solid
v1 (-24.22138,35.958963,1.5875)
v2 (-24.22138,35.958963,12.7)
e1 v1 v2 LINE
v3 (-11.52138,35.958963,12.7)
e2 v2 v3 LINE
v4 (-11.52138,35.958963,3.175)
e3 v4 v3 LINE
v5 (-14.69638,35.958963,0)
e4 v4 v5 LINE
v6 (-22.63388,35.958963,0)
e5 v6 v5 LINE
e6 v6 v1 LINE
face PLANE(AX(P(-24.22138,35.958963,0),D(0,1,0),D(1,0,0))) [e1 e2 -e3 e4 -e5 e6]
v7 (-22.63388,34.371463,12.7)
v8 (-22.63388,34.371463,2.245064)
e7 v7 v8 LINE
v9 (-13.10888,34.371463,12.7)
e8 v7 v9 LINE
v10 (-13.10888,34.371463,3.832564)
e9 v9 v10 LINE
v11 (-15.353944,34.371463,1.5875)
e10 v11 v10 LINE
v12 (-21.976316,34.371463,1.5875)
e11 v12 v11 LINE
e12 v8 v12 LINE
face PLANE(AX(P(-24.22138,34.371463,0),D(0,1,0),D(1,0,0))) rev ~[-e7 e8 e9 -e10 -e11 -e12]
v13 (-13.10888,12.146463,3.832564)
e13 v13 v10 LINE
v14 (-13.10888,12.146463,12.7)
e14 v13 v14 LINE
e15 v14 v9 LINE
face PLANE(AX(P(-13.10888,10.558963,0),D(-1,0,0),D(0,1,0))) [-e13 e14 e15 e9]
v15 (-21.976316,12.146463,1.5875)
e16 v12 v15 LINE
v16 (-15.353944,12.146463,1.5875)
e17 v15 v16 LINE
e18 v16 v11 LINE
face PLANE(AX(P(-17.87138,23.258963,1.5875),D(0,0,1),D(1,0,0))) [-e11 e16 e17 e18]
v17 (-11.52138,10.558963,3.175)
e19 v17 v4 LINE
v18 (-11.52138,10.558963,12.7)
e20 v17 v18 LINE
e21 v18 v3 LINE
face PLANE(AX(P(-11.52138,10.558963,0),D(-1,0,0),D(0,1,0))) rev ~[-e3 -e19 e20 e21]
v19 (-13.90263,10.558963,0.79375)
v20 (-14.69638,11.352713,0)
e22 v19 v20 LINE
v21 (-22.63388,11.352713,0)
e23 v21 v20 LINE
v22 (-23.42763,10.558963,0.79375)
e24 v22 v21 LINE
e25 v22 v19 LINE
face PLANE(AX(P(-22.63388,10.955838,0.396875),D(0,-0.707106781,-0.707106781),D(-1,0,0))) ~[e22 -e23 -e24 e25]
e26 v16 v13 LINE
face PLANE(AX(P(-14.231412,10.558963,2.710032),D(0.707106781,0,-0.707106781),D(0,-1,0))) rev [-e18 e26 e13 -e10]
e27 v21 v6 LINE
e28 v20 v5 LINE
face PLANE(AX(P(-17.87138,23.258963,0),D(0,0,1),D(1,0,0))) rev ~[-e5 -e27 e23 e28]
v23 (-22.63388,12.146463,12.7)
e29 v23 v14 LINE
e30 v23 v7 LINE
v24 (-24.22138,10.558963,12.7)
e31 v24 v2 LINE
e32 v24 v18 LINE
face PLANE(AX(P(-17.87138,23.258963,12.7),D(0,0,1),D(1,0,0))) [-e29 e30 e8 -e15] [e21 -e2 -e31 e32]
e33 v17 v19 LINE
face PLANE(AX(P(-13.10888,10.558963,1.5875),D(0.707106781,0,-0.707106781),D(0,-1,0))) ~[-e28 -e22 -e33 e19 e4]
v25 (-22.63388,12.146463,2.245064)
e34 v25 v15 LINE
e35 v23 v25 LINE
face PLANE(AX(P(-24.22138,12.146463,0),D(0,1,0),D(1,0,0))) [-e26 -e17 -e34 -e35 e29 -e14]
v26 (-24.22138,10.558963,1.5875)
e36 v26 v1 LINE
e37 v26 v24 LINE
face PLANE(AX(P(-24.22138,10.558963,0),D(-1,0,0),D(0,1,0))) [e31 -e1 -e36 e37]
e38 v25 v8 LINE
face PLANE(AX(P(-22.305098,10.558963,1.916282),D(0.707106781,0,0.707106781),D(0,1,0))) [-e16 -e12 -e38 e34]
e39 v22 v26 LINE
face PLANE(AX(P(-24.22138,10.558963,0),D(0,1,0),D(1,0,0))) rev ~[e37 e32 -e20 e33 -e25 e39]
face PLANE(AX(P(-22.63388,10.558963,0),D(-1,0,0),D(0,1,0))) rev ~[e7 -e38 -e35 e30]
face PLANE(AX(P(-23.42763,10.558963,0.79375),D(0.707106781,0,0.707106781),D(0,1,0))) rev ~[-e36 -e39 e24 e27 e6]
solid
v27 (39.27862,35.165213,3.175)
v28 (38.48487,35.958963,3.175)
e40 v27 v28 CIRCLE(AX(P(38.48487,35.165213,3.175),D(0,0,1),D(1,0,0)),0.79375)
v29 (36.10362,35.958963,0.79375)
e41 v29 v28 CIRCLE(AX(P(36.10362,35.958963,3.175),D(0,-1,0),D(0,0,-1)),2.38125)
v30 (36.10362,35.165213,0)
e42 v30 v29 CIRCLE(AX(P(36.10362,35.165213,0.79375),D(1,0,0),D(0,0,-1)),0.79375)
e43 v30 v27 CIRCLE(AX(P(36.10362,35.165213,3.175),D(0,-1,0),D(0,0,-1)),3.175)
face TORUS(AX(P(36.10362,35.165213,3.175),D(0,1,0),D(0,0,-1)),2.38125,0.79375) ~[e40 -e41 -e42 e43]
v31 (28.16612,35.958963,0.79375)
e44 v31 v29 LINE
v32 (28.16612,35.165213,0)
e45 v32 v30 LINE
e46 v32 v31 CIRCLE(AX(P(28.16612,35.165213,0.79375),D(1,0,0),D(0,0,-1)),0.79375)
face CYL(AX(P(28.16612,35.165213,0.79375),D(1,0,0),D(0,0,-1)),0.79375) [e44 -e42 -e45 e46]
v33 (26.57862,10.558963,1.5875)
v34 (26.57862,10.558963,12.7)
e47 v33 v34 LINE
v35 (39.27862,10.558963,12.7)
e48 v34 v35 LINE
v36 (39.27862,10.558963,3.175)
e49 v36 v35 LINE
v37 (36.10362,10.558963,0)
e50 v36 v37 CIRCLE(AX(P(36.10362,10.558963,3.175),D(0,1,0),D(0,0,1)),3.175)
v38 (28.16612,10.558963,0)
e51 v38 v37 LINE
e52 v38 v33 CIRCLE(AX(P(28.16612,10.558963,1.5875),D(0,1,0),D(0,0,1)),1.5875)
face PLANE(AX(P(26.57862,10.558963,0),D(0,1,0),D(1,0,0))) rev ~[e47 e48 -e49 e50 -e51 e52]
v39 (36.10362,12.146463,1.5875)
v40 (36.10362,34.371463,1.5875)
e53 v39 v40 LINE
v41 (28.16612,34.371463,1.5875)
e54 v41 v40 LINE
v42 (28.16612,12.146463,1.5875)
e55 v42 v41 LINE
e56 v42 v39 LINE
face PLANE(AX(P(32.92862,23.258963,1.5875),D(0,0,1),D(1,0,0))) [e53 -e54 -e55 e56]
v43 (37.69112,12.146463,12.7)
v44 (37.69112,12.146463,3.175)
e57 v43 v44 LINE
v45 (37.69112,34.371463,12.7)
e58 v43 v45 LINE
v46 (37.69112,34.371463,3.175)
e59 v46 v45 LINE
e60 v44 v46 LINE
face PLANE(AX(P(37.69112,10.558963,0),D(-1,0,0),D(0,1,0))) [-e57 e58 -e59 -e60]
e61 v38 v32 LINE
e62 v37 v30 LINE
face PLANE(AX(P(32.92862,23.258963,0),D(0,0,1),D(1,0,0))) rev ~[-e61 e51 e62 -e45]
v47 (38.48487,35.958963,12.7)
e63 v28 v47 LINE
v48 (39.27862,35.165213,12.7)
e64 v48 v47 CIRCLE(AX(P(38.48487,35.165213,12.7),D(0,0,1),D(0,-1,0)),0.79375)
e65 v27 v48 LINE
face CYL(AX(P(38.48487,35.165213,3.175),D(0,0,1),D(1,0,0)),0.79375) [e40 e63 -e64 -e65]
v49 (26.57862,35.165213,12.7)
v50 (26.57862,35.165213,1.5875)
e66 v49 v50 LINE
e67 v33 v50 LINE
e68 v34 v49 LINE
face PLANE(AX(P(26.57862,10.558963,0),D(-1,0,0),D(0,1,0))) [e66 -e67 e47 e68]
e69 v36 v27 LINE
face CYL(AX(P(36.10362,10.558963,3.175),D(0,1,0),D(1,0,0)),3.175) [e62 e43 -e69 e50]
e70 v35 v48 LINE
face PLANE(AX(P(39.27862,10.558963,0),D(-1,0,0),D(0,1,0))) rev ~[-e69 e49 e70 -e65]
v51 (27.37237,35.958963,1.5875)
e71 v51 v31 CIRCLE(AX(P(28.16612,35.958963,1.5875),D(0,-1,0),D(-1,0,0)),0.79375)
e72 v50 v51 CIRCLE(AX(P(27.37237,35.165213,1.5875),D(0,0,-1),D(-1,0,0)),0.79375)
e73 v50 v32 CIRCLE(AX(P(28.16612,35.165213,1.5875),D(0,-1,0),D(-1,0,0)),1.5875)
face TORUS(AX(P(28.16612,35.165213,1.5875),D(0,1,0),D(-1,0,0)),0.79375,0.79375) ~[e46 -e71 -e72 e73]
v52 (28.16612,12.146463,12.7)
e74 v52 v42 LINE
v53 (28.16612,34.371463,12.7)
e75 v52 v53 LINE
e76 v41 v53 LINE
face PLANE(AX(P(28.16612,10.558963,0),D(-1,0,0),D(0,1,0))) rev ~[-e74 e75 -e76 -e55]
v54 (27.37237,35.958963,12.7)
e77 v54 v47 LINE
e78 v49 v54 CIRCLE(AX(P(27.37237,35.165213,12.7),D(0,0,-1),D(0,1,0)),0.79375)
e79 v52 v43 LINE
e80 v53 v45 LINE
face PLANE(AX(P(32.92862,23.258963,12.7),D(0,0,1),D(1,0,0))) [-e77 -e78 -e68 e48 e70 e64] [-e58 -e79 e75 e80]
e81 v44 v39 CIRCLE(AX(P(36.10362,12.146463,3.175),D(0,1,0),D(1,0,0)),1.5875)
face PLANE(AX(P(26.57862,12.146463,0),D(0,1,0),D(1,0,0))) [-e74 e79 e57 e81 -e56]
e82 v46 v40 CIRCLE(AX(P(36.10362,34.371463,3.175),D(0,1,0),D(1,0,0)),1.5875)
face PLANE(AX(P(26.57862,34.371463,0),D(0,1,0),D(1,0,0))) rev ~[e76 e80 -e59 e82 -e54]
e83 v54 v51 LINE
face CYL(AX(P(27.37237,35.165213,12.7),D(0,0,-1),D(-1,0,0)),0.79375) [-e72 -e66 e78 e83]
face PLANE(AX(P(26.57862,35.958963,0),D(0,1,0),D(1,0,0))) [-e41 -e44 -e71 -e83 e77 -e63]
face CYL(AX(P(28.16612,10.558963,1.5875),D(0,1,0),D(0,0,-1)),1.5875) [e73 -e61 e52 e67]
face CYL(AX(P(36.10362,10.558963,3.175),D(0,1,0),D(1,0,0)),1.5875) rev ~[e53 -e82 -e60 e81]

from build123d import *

# Parameters (mm, degrees)
F0_W     = 12.7
F0_H     = 25.4
F1_DEPTH = 12.7
F3_SIZE  = 3.175
F4_SIZE  = 1.5875
F5_SIZE  = 0.79375
F6_T     = -1.5875
F7_R     = 3.175
F8_R     = 1.5875
F9_R     = 0.79375
F10_T    = 1.5875


# Not quite as in the source:
# - a shell that OpenCascade refuses in one call is made with other operations: the cavity is built on its own and cut out


with BuildPart() as f1:
    # F0 (on Top) → F1 (new body)
    with BuildSketch(Plane.XY):
        with Locations((-17.8713803947, 23.258962822)):
            Rectangle(F0_W, F0_H)
    extrude(amount=F1_DEPTH)


with BuildPart() as f2_1:
    # F2: copy of F1
    add(f1.part.moved(Location((50.8, 0, 0))))

    # F7
    f7_edges = [f2_1.edges().sort_by_distance(p)[0] for p in [
        (39.27862, 23.258963, 0),
    ]]
    fillet(f7_edges, radius=F7_R)

    # F8
    f8_edges = [f2_1.edges().sort_by_distance(p)[0] for p in [
        (26.57862, 23.258963, 0),
    ]]
    fillet(f8_edges, radius=F8_R)

    # F9
    f9_edges = [f2_1.edges().sort_by_distance(p)[0] for p in [
        (32.13487, 35.958963, 0),
    ]]
    fillet(f9_edges, radius=F9_R)

    # F10: shell of thickness 1.5875, made by hand


with BuildPart() as f1_1:
    add(f1.part)

    # F3
    f3_edges = [f1_1.edges().sort_by_distance(p)[0] for p in [
        (-11.52138, 23.258963, 0),
    ]]
    chamfer(f3_edges, length=F3_SIZE)

    # F4
    f4_edges = [f1_1.edges().sort_by_distance(p)[0] for p in [
        (-24.22138, 23.258963, 0),
    ]]
    chamfer(f4_edges, length=F4_SIZE)

    # F5
    f5_edges = [f1_1.edges().sort_by_distance(p)[0] for p in [
        (-18.66513, 10.558963, 0),
    ]]
    chamfer(f5_edges, length=F5_SIZE)

    # F6
    f6_openings = [f1_1.faces().sort_by_distance(p)[0] for p in [
        (-17.87138, 23.258963, 12.7),
    ]]
    offset(amount=F6_T, openings=f6_openings)


with BuildPart() as f10_core1:
    # F10_t2: copy of F2_1
    add(f2_1.part)

    # the walls: a layer under each face that stays
    f10_faces = [f10_core1.faces().sort_by_distance(p)[0] for p in [
        (32.9286196053, 35.958962822, 6.746875),
        (39.2786196053, 22.862087822, 7.9375),
        (26.5786196053, 22.862087822, 7.14375),
        (32.9286196053, 10.558962822, 6.35),
        (38.3486836356, 22.862087822, 0.9299359697),
        (32.1348696053, 22.862087822, 0),
    ]]
    thicken(f10_faces, amount=-F10_T, mode=Mode.SUBTRACT)


with BuildPart() as f2_1_1:
    add(f2_1.part)

    # what is left inside the walls is the cavity
    f10_cavity = [f10_core1.part.solids().sort_by_distance(p)[0] for p in [
        (28.181995, 23.258963, 8.995833),
    ]]
    add(f10_cavity, mode=Mode.SUBTRACT)


solid = Compound([f1_1.part, f2_1_1.part])
